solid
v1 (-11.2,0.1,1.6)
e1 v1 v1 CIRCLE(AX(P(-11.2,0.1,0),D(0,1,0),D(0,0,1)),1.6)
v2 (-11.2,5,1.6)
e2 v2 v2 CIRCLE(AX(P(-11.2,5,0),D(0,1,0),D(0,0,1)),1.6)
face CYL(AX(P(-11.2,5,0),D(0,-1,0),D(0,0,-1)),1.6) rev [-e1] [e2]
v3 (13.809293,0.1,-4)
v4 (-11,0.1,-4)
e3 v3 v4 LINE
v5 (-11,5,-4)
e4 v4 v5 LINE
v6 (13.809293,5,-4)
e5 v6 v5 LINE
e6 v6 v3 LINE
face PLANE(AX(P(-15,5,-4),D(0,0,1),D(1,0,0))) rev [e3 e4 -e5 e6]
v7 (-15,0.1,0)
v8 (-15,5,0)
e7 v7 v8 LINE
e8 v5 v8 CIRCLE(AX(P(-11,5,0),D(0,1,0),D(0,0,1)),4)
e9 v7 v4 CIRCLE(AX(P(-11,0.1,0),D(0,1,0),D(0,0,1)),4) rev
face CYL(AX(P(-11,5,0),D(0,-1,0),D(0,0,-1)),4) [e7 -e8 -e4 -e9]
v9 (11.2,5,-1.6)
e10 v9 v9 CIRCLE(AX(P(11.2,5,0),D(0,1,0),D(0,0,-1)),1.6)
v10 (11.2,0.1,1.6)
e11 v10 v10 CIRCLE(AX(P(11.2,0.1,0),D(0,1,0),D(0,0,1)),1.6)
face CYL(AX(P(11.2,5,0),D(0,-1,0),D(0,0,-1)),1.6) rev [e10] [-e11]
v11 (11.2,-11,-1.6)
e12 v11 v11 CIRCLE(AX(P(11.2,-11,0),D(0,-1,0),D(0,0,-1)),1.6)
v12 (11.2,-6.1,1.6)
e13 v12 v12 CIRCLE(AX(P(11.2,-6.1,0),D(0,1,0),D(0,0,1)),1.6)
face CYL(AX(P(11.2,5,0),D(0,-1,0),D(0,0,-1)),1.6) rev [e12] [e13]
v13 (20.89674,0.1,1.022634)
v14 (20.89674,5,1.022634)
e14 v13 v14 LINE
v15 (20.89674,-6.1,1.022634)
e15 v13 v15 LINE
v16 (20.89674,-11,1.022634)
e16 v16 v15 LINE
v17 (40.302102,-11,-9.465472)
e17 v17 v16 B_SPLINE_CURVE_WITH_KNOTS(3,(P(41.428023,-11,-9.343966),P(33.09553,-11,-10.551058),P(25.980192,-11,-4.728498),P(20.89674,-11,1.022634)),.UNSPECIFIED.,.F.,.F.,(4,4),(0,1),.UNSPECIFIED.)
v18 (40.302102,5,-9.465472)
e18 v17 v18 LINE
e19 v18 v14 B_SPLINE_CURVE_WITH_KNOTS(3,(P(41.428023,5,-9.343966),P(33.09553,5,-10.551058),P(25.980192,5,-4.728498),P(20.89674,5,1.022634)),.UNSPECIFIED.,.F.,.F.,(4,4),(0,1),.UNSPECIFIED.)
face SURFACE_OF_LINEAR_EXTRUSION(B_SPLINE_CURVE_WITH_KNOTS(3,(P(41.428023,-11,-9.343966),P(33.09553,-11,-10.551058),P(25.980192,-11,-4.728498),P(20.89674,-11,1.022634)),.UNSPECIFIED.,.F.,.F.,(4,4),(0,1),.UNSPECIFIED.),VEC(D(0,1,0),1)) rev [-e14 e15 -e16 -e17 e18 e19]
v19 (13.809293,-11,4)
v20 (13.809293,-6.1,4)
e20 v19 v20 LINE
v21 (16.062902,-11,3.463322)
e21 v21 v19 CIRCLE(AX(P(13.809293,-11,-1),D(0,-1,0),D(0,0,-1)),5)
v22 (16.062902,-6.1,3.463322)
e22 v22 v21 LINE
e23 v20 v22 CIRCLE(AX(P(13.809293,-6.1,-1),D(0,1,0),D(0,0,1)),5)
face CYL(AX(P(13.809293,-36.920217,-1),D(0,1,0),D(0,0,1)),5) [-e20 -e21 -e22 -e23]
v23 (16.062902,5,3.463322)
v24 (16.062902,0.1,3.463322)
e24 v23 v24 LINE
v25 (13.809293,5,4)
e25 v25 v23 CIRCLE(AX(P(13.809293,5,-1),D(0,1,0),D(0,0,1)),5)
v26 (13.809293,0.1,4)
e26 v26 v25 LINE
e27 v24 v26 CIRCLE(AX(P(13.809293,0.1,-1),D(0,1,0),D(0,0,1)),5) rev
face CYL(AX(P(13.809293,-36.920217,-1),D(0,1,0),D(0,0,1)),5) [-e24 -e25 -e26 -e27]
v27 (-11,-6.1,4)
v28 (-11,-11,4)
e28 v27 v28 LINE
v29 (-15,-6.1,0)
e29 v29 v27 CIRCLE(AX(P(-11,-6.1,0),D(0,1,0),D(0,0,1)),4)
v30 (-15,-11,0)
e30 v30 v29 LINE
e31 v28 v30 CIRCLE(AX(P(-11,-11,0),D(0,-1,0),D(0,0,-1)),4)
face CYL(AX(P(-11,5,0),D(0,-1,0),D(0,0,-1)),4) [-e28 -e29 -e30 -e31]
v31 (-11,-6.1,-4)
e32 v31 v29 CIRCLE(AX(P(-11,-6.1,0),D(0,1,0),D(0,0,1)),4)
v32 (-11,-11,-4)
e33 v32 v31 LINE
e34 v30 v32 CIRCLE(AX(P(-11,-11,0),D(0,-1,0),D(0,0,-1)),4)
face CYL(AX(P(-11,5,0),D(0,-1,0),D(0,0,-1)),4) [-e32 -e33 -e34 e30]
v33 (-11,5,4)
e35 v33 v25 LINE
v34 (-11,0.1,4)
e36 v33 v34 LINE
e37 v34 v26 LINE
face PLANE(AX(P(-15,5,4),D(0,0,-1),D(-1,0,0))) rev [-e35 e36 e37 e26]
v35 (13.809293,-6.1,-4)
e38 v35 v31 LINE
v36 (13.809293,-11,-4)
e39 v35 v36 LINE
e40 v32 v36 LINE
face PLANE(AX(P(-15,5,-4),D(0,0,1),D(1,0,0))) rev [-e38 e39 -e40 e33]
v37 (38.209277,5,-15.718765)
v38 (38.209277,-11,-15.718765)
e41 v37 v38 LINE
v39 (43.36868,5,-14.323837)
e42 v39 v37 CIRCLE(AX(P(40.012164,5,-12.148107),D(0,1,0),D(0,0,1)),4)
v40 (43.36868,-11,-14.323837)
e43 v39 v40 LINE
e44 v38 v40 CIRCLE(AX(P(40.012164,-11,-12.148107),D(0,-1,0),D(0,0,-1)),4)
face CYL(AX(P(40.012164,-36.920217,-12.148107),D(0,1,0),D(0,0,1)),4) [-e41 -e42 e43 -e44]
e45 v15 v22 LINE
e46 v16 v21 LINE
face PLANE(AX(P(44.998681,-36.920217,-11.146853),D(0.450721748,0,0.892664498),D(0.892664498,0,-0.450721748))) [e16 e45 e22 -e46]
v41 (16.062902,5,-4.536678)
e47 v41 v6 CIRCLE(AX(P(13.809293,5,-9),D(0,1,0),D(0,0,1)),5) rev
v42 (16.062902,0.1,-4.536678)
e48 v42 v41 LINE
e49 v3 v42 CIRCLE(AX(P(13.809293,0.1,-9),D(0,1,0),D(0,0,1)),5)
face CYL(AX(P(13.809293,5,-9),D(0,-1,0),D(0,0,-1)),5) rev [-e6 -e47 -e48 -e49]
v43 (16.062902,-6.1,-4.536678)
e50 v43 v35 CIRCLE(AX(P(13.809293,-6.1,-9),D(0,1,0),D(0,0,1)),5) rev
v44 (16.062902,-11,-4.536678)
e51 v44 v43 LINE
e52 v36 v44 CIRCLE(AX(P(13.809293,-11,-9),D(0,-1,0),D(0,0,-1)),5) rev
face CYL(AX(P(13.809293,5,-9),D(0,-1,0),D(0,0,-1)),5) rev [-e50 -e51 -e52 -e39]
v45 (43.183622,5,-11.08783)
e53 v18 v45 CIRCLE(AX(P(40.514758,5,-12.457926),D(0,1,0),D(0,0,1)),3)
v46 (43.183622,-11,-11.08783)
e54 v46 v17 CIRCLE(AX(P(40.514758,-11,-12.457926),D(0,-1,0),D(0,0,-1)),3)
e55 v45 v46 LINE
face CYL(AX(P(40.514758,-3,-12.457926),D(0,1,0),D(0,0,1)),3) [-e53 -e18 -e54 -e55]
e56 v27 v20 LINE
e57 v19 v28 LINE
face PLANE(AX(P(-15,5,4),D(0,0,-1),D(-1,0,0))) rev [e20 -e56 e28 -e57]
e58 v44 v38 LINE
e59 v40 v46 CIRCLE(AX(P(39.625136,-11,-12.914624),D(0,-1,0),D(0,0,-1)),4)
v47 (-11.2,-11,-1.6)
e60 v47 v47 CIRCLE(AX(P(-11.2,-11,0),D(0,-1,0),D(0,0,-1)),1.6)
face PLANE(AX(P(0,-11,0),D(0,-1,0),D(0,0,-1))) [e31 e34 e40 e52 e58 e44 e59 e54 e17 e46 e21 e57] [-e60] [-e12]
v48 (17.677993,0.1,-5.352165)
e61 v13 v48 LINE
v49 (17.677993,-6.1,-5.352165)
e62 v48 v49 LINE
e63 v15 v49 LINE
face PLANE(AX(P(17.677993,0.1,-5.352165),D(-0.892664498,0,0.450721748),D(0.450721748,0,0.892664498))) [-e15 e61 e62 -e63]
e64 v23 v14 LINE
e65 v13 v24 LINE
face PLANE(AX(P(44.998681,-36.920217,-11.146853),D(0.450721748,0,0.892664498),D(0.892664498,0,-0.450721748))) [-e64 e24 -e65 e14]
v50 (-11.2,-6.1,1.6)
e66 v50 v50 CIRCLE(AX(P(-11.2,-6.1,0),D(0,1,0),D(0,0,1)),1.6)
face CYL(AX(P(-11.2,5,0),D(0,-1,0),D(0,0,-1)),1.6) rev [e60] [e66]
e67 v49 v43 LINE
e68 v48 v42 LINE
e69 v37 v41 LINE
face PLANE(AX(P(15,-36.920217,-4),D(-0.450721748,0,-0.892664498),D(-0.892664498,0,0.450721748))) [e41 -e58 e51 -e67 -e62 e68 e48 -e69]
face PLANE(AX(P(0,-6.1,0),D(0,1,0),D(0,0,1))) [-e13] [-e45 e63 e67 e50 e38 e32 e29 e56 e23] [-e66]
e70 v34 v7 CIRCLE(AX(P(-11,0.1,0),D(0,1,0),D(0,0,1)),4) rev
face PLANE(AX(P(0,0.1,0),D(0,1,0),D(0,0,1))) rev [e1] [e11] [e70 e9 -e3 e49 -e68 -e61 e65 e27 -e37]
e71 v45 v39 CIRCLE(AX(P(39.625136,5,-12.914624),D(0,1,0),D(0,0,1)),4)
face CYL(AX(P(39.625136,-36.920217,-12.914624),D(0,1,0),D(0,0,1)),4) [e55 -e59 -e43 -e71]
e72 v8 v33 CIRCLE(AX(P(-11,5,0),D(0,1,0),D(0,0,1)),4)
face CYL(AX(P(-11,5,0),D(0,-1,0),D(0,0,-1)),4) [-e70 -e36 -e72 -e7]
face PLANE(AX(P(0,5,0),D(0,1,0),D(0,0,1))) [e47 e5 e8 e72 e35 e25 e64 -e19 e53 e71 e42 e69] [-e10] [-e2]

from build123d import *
from build123d.topology import SkipClean

# Parameters (mm, degrees)
SKETCH_1_W               = 30
SKETCH_1_H               = 8
SKETCH_1_R               = 1.6
EXTRUDE_1_DEPTH          = 5
EXTRUDE_2_DEPTH          = 5
EXTRUDE_START            = 11
SKETCH_3_R               = 1.6
EXTRUDE_3_DEPTH          = 11
CUT_EXTRUDE_1_DEPTH      = 0.1
CUT_EXTRUDE_1_DEPTH_BACK = 6.1
FILLET_1_R               = 4
FILLET_2_R               = 4
CUT_EXTRUDE_2_DEPTH      = 16
FILLET_3_R               = 3
FILLET_4_R               = 5


# Some blends are built 0.0001 mm under size
with BuildPart() as part:
    # 草图1 → 凸台-拉伸1 (new body)
    with BuildSketch(Plane(origin=(0, 0, 0), x_dir=(1, 0, 0), z_dir=(0, 1, 0))):
        Rectangle(SKETCH_1_W, SKETCH_1_H)
        with Locations(Location((-11.2, 0, 0), (0, 0, 270))):
            Circle(SKETCH_1_R, mode=Mode.SUBTRACT)
        with Locations(Location((11.2, 0, 0), (0, 0, 90))):
            Circle(SKETCH_1_R, mode=Mode.SUBTRACT)
    extrude(amount=EXTRUDE_1_DEPTH)

    # 草图2 → 凸台-拉伸2 (add)
    with BuildSketch(Plane(origin=(0, 5, 0), x_dir=(1, 0, 0), z_dir=(0, 1, 0))):
        Polygon((15, 4), (41.779934935, 17.521652446), (44.998681359, 11.146853201), (15, -4), align=None)
    extrude(amount=-EXTRUDE_2_DEPTH)

    # 草图3 → 凸台-拉伸3 (add)
    with SkipClean():  # the faces are left unmerged after this step: merging them gives an invalid solid
        with BuildSketch(Plane.XZ.offset(EXTRUDE_START)):
            Polygon((-15, -4), (15, -4), (41.779934935, -17.521652446), (44.998681359, -11.146853201), (15, 4), (-15, 4), align=None)
            with Locations(Location((-11.2, 0, 0), (0, 0, 270))):
                Circle(SKETCH_3_R, mode=Mode.SUBTRACT)
            with Locations(Location((11.2, 0, 0), (0, 0, 270))):
                Circle(SKETCH_3_R, mode=Mode.SUBTRACT)
        extrude(amount=-EXTRUDE_3_DEPTH)

    # 草图4 → 切除-拉伸1 (cut, two sides: drawn at the far end of the back side and taken through both)
    with BuildSketch(Plane(origin=(0, 0, 0), x_dir=(1, 0, 0), z_dir=(0, 1, 0)).offset(-CUT_EXTRUDE_1_DEPTH_BACK)):
        Polygon((17.677993493, 5.352165245), (20.899244527, -1.027594436), (19.919281017, -1.51616991), (15, -4), (-15, -4), (-15, 4), (15, 4), align=None)
    extrude(amount=CUT_EXTRUDE_1_DEPTH + CUT_EXTRUDE_1_DEPTH_BACK, mode=Mode.SUBTRACT)

    # 圆角1
    fillet_1_edges = [part.edges().sort_by_distance(p)[0] for p in [
        (-15, -8.55, -4),
        (-15, 2.55, -4),
        (-15, -8.55, 4),
        (-15, 2.55, 4),
    ]]
    fillet(fillet_1_edges, radius=FILLET_1_R - 0.0001)  # a hair under: the kernel refuses the full size

    # 圆角2
    # the kernel refuses this fillet: 4 mm, written as the material it takes off along each edge
    with BuildSketch(Plane(origin=(41.779934935, 15, -17.521652446), x_dir=(-0.8926644978329522, 0, 0.45072174820907335), z_dir=(0, -1, 0)), Plane(origin=(44.998681359, -21, -11.146853201), x_dir=(-0.8926644978329524, 0, 0.450721748209073), z_dir=(0, 1, 0))) as fillet_2_piece_1:
        with BuildLine():
            CenterArc((FILLET_2_R, -FILLET_2_R), FILLET_2_R, 90, 90)
            Line((0, -FILLET_2_R), (0, 0))
            Line((0, 0), (FILLET_2_R, 0))
        make_face()
    extrude(amount=36, mode=Mode.SUBTRACT)

    # 草图5 → 切除-拉伸2 (cut)
    with BuildSketch(Plane(origin=(0, 5, 0), x_dir=(1, 0, 0), z_dir=(0, 1, 0))):
        with BuildLine():
            Line((20.896739918, -1.022634001), (41.428023368, 9.343966208))
            add(Edge.make_bspline(
                [(20.896739918, -1.022634001), (25.980191779, 4.72849772), (33.095529518, 10.551057562), (41.428023368, 9.343966208)],
                knots=[0, 0, 0, 0, 1, 1, 1, 1], degree=3))
        make_face()
    extrude(amount=-CUT_EXTRUDE_2_DEPTH, mode=Mode.SUBTRACT)

    # 圆角3
    fillet_3_edges = [part.edges().sort_by_distance(p)[0] for p in [
        (41.428023368, -3, -9.343966208),
    ]]
    fillet(fillet_3_edges, radius=FILLET_3_R)

    # 圆角4
    fillet_4_edges = [part.edges().sort_by_distance(p)[0] for p in [
        (15, -8.55, 4),
        (15, -8.55, -4),
        (15, 2.55, 4),
        (15, 2.55, -4),
    ]]
    fillet(fillet_4_edges, radius=FILLET_4_R)


solid = part.part
